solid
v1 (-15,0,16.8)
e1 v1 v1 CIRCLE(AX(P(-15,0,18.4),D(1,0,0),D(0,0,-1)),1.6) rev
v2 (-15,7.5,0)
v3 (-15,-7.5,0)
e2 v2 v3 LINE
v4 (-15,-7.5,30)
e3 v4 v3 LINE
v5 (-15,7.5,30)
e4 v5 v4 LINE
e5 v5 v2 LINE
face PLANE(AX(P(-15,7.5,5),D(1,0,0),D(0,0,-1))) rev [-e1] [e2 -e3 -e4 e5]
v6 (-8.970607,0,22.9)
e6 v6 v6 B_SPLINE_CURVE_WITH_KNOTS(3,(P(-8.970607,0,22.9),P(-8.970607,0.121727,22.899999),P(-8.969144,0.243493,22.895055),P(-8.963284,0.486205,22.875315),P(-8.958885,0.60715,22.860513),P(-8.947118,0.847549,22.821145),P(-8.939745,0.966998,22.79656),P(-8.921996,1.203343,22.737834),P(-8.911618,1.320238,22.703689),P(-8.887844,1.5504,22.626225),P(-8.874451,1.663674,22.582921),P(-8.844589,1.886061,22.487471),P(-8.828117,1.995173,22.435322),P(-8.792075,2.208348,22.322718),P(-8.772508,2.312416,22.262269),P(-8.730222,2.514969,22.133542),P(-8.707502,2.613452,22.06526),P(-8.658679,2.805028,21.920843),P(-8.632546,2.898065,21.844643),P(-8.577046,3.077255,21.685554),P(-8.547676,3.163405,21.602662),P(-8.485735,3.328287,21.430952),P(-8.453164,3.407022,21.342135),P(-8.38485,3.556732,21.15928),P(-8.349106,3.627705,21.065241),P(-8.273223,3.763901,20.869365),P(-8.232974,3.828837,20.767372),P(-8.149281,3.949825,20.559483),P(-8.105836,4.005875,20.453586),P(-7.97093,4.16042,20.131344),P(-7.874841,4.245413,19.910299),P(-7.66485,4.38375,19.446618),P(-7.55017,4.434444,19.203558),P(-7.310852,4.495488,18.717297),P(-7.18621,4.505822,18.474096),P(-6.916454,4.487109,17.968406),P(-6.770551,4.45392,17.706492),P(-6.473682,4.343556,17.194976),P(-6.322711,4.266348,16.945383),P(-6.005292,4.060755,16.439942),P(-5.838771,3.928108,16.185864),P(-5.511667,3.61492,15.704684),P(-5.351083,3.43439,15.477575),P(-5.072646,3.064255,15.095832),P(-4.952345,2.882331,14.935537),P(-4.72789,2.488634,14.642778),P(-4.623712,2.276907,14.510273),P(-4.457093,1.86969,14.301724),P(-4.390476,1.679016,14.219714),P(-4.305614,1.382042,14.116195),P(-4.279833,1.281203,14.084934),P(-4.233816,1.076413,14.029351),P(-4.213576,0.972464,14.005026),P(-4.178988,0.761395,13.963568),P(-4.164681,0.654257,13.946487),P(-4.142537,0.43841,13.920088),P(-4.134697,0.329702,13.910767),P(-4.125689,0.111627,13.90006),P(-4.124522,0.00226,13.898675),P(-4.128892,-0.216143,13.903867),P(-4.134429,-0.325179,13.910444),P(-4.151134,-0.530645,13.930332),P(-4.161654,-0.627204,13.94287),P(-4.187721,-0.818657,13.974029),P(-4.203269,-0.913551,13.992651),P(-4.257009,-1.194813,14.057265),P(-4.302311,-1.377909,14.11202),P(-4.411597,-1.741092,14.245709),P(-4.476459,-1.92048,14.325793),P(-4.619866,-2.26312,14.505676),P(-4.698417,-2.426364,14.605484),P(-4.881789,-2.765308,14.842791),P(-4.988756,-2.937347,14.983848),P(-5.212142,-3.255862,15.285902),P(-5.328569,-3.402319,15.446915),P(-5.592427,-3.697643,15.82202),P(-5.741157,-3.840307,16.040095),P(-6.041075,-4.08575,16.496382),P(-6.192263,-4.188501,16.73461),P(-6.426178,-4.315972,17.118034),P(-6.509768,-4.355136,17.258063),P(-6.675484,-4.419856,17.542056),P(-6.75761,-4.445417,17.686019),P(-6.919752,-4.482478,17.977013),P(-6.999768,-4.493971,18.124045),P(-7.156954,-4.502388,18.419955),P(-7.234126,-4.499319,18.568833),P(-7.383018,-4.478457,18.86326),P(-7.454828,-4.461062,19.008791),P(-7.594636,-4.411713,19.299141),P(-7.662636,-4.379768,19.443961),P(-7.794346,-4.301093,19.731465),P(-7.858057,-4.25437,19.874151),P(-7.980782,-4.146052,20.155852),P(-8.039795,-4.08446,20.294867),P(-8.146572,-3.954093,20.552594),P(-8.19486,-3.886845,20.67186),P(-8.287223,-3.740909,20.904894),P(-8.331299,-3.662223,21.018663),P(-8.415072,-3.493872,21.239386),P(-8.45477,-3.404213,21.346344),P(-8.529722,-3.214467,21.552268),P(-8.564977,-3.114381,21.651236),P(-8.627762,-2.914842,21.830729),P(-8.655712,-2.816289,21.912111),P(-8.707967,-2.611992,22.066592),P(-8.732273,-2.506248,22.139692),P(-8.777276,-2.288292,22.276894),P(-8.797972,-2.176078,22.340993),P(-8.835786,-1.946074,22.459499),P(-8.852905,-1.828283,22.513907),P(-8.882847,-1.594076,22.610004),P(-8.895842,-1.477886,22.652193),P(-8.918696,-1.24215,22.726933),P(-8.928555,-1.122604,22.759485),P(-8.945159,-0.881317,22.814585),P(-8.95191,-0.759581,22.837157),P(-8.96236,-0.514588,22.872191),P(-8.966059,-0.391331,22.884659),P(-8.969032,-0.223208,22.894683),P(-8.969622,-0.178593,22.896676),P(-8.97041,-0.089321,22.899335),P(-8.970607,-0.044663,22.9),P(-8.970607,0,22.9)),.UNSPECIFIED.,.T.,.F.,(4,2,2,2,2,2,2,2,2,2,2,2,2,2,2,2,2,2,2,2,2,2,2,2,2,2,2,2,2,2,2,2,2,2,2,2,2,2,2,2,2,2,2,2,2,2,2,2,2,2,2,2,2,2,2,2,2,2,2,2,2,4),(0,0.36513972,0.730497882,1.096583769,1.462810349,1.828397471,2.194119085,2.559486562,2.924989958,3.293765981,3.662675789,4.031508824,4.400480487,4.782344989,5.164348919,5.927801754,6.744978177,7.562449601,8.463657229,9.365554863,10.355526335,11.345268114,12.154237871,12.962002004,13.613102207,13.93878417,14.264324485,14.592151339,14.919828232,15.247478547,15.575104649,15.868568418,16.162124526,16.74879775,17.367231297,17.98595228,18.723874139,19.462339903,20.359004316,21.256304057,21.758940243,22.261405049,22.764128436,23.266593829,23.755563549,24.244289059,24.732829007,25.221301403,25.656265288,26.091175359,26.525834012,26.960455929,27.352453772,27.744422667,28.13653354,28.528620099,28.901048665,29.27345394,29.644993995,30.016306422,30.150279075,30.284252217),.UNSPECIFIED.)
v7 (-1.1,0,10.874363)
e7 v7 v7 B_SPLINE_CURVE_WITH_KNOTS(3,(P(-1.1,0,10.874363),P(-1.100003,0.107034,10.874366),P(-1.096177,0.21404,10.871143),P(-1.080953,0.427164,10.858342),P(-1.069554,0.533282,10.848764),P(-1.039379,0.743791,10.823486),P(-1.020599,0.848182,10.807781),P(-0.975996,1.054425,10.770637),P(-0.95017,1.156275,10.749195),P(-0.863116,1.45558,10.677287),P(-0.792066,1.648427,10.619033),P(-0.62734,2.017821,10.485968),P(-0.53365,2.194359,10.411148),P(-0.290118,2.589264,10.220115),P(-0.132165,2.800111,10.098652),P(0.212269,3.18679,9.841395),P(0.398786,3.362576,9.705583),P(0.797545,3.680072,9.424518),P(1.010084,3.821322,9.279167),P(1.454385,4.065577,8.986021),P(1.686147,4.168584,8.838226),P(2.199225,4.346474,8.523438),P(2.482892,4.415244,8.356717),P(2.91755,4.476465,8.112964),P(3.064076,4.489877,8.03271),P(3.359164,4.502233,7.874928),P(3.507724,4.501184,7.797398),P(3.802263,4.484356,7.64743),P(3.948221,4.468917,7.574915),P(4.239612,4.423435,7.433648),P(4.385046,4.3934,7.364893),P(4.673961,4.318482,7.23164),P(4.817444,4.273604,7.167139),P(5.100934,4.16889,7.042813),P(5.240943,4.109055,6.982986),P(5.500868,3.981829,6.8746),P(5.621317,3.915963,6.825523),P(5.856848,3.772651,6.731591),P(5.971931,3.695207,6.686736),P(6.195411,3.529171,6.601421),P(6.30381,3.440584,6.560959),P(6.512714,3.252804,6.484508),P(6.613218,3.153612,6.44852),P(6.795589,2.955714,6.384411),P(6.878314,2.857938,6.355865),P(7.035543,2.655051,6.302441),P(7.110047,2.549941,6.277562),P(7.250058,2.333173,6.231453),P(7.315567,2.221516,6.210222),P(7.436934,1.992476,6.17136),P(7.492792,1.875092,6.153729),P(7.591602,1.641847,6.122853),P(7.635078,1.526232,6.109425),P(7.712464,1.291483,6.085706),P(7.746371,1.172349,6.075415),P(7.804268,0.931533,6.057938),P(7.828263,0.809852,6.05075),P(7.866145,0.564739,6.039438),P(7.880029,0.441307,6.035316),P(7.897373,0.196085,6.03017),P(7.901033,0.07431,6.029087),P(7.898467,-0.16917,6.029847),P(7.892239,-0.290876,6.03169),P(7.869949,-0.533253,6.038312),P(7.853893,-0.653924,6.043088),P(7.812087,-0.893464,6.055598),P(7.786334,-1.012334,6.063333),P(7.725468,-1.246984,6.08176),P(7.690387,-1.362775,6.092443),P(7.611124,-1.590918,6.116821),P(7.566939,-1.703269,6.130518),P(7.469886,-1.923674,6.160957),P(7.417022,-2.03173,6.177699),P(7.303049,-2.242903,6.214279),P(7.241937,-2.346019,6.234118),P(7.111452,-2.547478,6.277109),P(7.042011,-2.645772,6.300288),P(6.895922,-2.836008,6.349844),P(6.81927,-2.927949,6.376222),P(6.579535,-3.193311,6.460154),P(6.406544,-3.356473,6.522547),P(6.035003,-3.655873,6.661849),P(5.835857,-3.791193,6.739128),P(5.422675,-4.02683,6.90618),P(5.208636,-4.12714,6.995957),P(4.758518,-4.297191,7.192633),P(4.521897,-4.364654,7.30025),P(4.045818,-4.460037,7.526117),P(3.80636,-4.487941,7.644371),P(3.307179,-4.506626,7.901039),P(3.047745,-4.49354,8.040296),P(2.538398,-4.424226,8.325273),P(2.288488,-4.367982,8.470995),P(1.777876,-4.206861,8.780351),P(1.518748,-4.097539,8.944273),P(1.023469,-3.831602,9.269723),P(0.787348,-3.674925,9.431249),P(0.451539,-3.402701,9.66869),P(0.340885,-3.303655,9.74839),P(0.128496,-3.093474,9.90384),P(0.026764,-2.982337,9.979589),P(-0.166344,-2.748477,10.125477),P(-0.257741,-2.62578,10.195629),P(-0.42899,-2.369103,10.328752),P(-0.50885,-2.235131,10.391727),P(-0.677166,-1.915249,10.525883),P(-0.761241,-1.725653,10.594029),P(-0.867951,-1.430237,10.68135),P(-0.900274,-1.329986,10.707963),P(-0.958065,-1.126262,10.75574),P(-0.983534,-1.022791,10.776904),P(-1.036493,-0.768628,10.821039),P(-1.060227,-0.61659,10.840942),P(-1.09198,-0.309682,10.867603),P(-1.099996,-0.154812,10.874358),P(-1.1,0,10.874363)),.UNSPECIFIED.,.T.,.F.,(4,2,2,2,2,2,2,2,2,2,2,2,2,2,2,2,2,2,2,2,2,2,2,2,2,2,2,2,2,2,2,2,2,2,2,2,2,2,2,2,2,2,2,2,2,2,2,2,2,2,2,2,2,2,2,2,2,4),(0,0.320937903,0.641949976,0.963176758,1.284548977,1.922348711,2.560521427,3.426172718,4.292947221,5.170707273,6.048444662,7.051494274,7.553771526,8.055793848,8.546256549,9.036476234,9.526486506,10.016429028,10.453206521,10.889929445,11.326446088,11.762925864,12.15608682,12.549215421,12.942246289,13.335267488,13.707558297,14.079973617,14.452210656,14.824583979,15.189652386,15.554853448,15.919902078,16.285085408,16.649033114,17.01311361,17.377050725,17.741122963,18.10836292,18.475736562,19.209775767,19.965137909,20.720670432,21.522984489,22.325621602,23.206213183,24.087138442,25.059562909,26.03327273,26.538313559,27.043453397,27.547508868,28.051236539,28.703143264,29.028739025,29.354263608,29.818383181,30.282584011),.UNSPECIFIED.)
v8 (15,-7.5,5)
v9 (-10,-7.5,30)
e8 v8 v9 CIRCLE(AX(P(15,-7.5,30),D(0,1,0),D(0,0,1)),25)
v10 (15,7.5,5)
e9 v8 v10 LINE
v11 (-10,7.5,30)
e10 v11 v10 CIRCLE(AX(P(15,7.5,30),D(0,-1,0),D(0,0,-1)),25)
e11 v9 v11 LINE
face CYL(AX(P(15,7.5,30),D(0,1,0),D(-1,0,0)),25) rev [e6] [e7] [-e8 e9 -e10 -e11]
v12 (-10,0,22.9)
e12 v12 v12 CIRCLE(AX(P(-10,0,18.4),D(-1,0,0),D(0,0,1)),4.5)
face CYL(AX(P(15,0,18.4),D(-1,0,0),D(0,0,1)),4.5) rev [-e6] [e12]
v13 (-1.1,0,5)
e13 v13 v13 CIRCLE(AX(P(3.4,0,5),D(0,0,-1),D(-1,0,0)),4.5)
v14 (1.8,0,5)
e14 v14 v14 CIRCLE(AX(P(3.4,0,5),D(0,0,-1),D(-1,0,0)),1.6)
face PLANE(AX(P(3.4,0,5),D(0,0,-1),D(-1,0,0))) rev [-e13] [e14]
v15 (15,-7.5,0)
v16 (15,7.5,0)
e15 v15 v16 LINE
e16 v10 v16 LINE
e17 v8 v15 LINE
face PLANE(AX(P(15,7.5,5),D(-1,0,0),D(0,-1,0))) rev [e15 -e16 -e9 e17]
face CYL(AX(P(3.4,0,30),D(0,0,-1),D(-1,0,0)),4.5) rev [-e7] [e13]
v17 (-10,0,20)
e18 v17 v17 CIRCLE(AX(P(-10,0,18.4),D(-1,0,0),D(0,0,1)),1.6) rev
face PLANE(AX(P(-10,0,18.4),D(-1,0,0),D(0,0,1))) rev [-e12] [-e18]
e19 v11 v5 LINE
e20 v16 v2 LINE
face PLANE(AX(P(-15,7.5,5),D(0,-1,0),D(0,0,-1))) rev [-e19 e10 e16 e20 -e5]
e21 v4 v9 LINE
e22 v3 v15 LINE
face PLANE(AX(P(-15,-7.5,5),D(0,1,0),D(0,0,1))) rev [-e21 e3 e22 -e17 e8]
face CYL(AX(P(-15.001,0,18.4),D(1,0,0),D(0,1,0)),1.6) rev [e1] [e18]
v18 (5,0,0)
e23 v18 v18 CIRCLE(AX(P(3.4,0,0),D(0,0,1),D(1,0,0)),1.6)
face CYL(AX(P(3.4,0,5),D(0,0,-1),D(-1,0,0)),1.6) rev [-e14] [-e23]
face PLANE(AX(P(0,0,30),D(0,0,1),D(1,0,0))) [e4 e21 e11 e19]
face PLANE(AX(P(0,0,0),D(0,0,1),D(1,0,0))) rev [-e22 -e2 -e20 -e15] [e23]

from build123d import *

# Parameters (mm, degrees)
SKETCH1_W           = 30
SKETCH1_H           = 15
SKETCH1_R           = 1.6
BOSS_EXTRUDE1_DEPTH = 5
SKETCH2_W           = 5
SKETCH2_H           = 15
BOSS_EXTRUDE2_DEPTH = 25
CUT_EXTRUDE1_REACH  = 41.765
SKETCH3_R           = 1.6
FILLET1_R           = 25
CUT_EXTRUDE2_START  = -5
SKETCH4_R           = 4.5
CUT_EXTRUDE2_DEPTH  = 39.084220006
CUT_EXTRUDE3_START  = -5
SKETCH5_R           = 4.5
CUT_EXTRUDE3_DEPTH  = 30.369317865


with BuildPart() as part:
    # Sketch1 → Boss-Extrude1 (new body)
    with BuildSketch(Plane.XY):
        Rectangle(SKETCH1_W, SKETCH1_H)
        with Locations((3.4, 0)):
            Circle(SKETCH1_R, mode=Mode.SUBTRACT)
    extrude(amount=BOSS_EXTRUDE1_DEPTH)

    # Sketch2 → Boss-Extrude2 (add)
    with BuildSketch(Plane.XY.offset(5)):
        with Locations((-12.5, 0)):
            Rectangle(SKETCH2_W, SKETCH2_H)
    extrude(amount=BOSS_EXTRUDE2_DEPTH)

    # Sketch3 → Cut-Extrude1 (cut, up to next)
    with BuildSketch(Plane(origin=(-10, 0, 0), x_dir=(0, 0, -1), z_dir=(1, 0, 0)), mode=Mode.PRIVATE) as cut_extrude1_sk1:
        with Locations(Location((-18.4, 0, 0), (0, 0, 90))):
            Circle(SKETCH3_R)
    cut_extrude1_tool1 = extrude(cut_extrude1_sk1.sketch, amount=-CUT_EXTRUDE1_REACH, mode=Mode.PRIVATE) & part.part
    add(cut_extrude1_tool1.solids().sort_by_distance((-10, 0, 18.4))[0], mode=Mode.SUBTRACT)

    # Fillet1
    # the kernel refuses this fillet: 25 mm, written as the material it adds along each edge
    with BuildSketch(Plane(origin=(-10, 7.5, 5), x_dir=(0, 0, 1), z_dir=(0, -1, 0))) as fillet1_piece_1_section:
        with BuildLine():
            CenterArc((FILLET1_R, -FILLET1_R), FILLET1_R, 90, 90)
            Line((0, -FILLET1_R), (0, 0))
            Line((0, 0), (FILLET1_R, 0))
        make_face()
    fillet1_piece_1 = extrude(amount=15, mode=Mode.PRIVATE)
    fillet1_piece_1 = fillet1_piece_1 - Plane(origin=(-4.377200925, 0, 18.4), x_dir=(0, 1, 0), z_dir=(1, 0, 0)) * Cylinder(1.6, 130, mode=Mode.PRIVATE)
    fillet1_piece_1 = fillet1_piece_1 - Plane(origin=(3.4, 0, 10.622848357), x_dir=(1, 0, 0), z_dir=(0, 0, -1)) * Cylinder(1.6, 130, mode=Mode.PRIVATE)
    add(fillet1_piece_1)

    # Sketch4 → Cut-Extrude2 (cut, through all)
    with BuildSketch(Plane.ZY.offset(15).offset(CUT_EXTRUDE2_START)):
        with Locations((18.4, 0)):
            Circle(SKETCH4_R)
    extrude(amount=-CUT_EXTRUDE2_DEPTH, mode=Mode.SUBTRACT)

    # Sketch5 → Cut-Extrude3 (cut, through all)
    with BuildSketch(Plane(origin=(0, 0, 0), x_dir=(-1, 0, 0), z_dir=(0, 0, -1)).offset(CUT_EXTRUDE3_START)):
        with Locations((-3.4, 0)):
            Circle(SKETCH5_R)
    extrude(amount=-CUT_EXTRUDE3_DEPTH, mode=Mode.SUBTRACT)


solid = part.part
